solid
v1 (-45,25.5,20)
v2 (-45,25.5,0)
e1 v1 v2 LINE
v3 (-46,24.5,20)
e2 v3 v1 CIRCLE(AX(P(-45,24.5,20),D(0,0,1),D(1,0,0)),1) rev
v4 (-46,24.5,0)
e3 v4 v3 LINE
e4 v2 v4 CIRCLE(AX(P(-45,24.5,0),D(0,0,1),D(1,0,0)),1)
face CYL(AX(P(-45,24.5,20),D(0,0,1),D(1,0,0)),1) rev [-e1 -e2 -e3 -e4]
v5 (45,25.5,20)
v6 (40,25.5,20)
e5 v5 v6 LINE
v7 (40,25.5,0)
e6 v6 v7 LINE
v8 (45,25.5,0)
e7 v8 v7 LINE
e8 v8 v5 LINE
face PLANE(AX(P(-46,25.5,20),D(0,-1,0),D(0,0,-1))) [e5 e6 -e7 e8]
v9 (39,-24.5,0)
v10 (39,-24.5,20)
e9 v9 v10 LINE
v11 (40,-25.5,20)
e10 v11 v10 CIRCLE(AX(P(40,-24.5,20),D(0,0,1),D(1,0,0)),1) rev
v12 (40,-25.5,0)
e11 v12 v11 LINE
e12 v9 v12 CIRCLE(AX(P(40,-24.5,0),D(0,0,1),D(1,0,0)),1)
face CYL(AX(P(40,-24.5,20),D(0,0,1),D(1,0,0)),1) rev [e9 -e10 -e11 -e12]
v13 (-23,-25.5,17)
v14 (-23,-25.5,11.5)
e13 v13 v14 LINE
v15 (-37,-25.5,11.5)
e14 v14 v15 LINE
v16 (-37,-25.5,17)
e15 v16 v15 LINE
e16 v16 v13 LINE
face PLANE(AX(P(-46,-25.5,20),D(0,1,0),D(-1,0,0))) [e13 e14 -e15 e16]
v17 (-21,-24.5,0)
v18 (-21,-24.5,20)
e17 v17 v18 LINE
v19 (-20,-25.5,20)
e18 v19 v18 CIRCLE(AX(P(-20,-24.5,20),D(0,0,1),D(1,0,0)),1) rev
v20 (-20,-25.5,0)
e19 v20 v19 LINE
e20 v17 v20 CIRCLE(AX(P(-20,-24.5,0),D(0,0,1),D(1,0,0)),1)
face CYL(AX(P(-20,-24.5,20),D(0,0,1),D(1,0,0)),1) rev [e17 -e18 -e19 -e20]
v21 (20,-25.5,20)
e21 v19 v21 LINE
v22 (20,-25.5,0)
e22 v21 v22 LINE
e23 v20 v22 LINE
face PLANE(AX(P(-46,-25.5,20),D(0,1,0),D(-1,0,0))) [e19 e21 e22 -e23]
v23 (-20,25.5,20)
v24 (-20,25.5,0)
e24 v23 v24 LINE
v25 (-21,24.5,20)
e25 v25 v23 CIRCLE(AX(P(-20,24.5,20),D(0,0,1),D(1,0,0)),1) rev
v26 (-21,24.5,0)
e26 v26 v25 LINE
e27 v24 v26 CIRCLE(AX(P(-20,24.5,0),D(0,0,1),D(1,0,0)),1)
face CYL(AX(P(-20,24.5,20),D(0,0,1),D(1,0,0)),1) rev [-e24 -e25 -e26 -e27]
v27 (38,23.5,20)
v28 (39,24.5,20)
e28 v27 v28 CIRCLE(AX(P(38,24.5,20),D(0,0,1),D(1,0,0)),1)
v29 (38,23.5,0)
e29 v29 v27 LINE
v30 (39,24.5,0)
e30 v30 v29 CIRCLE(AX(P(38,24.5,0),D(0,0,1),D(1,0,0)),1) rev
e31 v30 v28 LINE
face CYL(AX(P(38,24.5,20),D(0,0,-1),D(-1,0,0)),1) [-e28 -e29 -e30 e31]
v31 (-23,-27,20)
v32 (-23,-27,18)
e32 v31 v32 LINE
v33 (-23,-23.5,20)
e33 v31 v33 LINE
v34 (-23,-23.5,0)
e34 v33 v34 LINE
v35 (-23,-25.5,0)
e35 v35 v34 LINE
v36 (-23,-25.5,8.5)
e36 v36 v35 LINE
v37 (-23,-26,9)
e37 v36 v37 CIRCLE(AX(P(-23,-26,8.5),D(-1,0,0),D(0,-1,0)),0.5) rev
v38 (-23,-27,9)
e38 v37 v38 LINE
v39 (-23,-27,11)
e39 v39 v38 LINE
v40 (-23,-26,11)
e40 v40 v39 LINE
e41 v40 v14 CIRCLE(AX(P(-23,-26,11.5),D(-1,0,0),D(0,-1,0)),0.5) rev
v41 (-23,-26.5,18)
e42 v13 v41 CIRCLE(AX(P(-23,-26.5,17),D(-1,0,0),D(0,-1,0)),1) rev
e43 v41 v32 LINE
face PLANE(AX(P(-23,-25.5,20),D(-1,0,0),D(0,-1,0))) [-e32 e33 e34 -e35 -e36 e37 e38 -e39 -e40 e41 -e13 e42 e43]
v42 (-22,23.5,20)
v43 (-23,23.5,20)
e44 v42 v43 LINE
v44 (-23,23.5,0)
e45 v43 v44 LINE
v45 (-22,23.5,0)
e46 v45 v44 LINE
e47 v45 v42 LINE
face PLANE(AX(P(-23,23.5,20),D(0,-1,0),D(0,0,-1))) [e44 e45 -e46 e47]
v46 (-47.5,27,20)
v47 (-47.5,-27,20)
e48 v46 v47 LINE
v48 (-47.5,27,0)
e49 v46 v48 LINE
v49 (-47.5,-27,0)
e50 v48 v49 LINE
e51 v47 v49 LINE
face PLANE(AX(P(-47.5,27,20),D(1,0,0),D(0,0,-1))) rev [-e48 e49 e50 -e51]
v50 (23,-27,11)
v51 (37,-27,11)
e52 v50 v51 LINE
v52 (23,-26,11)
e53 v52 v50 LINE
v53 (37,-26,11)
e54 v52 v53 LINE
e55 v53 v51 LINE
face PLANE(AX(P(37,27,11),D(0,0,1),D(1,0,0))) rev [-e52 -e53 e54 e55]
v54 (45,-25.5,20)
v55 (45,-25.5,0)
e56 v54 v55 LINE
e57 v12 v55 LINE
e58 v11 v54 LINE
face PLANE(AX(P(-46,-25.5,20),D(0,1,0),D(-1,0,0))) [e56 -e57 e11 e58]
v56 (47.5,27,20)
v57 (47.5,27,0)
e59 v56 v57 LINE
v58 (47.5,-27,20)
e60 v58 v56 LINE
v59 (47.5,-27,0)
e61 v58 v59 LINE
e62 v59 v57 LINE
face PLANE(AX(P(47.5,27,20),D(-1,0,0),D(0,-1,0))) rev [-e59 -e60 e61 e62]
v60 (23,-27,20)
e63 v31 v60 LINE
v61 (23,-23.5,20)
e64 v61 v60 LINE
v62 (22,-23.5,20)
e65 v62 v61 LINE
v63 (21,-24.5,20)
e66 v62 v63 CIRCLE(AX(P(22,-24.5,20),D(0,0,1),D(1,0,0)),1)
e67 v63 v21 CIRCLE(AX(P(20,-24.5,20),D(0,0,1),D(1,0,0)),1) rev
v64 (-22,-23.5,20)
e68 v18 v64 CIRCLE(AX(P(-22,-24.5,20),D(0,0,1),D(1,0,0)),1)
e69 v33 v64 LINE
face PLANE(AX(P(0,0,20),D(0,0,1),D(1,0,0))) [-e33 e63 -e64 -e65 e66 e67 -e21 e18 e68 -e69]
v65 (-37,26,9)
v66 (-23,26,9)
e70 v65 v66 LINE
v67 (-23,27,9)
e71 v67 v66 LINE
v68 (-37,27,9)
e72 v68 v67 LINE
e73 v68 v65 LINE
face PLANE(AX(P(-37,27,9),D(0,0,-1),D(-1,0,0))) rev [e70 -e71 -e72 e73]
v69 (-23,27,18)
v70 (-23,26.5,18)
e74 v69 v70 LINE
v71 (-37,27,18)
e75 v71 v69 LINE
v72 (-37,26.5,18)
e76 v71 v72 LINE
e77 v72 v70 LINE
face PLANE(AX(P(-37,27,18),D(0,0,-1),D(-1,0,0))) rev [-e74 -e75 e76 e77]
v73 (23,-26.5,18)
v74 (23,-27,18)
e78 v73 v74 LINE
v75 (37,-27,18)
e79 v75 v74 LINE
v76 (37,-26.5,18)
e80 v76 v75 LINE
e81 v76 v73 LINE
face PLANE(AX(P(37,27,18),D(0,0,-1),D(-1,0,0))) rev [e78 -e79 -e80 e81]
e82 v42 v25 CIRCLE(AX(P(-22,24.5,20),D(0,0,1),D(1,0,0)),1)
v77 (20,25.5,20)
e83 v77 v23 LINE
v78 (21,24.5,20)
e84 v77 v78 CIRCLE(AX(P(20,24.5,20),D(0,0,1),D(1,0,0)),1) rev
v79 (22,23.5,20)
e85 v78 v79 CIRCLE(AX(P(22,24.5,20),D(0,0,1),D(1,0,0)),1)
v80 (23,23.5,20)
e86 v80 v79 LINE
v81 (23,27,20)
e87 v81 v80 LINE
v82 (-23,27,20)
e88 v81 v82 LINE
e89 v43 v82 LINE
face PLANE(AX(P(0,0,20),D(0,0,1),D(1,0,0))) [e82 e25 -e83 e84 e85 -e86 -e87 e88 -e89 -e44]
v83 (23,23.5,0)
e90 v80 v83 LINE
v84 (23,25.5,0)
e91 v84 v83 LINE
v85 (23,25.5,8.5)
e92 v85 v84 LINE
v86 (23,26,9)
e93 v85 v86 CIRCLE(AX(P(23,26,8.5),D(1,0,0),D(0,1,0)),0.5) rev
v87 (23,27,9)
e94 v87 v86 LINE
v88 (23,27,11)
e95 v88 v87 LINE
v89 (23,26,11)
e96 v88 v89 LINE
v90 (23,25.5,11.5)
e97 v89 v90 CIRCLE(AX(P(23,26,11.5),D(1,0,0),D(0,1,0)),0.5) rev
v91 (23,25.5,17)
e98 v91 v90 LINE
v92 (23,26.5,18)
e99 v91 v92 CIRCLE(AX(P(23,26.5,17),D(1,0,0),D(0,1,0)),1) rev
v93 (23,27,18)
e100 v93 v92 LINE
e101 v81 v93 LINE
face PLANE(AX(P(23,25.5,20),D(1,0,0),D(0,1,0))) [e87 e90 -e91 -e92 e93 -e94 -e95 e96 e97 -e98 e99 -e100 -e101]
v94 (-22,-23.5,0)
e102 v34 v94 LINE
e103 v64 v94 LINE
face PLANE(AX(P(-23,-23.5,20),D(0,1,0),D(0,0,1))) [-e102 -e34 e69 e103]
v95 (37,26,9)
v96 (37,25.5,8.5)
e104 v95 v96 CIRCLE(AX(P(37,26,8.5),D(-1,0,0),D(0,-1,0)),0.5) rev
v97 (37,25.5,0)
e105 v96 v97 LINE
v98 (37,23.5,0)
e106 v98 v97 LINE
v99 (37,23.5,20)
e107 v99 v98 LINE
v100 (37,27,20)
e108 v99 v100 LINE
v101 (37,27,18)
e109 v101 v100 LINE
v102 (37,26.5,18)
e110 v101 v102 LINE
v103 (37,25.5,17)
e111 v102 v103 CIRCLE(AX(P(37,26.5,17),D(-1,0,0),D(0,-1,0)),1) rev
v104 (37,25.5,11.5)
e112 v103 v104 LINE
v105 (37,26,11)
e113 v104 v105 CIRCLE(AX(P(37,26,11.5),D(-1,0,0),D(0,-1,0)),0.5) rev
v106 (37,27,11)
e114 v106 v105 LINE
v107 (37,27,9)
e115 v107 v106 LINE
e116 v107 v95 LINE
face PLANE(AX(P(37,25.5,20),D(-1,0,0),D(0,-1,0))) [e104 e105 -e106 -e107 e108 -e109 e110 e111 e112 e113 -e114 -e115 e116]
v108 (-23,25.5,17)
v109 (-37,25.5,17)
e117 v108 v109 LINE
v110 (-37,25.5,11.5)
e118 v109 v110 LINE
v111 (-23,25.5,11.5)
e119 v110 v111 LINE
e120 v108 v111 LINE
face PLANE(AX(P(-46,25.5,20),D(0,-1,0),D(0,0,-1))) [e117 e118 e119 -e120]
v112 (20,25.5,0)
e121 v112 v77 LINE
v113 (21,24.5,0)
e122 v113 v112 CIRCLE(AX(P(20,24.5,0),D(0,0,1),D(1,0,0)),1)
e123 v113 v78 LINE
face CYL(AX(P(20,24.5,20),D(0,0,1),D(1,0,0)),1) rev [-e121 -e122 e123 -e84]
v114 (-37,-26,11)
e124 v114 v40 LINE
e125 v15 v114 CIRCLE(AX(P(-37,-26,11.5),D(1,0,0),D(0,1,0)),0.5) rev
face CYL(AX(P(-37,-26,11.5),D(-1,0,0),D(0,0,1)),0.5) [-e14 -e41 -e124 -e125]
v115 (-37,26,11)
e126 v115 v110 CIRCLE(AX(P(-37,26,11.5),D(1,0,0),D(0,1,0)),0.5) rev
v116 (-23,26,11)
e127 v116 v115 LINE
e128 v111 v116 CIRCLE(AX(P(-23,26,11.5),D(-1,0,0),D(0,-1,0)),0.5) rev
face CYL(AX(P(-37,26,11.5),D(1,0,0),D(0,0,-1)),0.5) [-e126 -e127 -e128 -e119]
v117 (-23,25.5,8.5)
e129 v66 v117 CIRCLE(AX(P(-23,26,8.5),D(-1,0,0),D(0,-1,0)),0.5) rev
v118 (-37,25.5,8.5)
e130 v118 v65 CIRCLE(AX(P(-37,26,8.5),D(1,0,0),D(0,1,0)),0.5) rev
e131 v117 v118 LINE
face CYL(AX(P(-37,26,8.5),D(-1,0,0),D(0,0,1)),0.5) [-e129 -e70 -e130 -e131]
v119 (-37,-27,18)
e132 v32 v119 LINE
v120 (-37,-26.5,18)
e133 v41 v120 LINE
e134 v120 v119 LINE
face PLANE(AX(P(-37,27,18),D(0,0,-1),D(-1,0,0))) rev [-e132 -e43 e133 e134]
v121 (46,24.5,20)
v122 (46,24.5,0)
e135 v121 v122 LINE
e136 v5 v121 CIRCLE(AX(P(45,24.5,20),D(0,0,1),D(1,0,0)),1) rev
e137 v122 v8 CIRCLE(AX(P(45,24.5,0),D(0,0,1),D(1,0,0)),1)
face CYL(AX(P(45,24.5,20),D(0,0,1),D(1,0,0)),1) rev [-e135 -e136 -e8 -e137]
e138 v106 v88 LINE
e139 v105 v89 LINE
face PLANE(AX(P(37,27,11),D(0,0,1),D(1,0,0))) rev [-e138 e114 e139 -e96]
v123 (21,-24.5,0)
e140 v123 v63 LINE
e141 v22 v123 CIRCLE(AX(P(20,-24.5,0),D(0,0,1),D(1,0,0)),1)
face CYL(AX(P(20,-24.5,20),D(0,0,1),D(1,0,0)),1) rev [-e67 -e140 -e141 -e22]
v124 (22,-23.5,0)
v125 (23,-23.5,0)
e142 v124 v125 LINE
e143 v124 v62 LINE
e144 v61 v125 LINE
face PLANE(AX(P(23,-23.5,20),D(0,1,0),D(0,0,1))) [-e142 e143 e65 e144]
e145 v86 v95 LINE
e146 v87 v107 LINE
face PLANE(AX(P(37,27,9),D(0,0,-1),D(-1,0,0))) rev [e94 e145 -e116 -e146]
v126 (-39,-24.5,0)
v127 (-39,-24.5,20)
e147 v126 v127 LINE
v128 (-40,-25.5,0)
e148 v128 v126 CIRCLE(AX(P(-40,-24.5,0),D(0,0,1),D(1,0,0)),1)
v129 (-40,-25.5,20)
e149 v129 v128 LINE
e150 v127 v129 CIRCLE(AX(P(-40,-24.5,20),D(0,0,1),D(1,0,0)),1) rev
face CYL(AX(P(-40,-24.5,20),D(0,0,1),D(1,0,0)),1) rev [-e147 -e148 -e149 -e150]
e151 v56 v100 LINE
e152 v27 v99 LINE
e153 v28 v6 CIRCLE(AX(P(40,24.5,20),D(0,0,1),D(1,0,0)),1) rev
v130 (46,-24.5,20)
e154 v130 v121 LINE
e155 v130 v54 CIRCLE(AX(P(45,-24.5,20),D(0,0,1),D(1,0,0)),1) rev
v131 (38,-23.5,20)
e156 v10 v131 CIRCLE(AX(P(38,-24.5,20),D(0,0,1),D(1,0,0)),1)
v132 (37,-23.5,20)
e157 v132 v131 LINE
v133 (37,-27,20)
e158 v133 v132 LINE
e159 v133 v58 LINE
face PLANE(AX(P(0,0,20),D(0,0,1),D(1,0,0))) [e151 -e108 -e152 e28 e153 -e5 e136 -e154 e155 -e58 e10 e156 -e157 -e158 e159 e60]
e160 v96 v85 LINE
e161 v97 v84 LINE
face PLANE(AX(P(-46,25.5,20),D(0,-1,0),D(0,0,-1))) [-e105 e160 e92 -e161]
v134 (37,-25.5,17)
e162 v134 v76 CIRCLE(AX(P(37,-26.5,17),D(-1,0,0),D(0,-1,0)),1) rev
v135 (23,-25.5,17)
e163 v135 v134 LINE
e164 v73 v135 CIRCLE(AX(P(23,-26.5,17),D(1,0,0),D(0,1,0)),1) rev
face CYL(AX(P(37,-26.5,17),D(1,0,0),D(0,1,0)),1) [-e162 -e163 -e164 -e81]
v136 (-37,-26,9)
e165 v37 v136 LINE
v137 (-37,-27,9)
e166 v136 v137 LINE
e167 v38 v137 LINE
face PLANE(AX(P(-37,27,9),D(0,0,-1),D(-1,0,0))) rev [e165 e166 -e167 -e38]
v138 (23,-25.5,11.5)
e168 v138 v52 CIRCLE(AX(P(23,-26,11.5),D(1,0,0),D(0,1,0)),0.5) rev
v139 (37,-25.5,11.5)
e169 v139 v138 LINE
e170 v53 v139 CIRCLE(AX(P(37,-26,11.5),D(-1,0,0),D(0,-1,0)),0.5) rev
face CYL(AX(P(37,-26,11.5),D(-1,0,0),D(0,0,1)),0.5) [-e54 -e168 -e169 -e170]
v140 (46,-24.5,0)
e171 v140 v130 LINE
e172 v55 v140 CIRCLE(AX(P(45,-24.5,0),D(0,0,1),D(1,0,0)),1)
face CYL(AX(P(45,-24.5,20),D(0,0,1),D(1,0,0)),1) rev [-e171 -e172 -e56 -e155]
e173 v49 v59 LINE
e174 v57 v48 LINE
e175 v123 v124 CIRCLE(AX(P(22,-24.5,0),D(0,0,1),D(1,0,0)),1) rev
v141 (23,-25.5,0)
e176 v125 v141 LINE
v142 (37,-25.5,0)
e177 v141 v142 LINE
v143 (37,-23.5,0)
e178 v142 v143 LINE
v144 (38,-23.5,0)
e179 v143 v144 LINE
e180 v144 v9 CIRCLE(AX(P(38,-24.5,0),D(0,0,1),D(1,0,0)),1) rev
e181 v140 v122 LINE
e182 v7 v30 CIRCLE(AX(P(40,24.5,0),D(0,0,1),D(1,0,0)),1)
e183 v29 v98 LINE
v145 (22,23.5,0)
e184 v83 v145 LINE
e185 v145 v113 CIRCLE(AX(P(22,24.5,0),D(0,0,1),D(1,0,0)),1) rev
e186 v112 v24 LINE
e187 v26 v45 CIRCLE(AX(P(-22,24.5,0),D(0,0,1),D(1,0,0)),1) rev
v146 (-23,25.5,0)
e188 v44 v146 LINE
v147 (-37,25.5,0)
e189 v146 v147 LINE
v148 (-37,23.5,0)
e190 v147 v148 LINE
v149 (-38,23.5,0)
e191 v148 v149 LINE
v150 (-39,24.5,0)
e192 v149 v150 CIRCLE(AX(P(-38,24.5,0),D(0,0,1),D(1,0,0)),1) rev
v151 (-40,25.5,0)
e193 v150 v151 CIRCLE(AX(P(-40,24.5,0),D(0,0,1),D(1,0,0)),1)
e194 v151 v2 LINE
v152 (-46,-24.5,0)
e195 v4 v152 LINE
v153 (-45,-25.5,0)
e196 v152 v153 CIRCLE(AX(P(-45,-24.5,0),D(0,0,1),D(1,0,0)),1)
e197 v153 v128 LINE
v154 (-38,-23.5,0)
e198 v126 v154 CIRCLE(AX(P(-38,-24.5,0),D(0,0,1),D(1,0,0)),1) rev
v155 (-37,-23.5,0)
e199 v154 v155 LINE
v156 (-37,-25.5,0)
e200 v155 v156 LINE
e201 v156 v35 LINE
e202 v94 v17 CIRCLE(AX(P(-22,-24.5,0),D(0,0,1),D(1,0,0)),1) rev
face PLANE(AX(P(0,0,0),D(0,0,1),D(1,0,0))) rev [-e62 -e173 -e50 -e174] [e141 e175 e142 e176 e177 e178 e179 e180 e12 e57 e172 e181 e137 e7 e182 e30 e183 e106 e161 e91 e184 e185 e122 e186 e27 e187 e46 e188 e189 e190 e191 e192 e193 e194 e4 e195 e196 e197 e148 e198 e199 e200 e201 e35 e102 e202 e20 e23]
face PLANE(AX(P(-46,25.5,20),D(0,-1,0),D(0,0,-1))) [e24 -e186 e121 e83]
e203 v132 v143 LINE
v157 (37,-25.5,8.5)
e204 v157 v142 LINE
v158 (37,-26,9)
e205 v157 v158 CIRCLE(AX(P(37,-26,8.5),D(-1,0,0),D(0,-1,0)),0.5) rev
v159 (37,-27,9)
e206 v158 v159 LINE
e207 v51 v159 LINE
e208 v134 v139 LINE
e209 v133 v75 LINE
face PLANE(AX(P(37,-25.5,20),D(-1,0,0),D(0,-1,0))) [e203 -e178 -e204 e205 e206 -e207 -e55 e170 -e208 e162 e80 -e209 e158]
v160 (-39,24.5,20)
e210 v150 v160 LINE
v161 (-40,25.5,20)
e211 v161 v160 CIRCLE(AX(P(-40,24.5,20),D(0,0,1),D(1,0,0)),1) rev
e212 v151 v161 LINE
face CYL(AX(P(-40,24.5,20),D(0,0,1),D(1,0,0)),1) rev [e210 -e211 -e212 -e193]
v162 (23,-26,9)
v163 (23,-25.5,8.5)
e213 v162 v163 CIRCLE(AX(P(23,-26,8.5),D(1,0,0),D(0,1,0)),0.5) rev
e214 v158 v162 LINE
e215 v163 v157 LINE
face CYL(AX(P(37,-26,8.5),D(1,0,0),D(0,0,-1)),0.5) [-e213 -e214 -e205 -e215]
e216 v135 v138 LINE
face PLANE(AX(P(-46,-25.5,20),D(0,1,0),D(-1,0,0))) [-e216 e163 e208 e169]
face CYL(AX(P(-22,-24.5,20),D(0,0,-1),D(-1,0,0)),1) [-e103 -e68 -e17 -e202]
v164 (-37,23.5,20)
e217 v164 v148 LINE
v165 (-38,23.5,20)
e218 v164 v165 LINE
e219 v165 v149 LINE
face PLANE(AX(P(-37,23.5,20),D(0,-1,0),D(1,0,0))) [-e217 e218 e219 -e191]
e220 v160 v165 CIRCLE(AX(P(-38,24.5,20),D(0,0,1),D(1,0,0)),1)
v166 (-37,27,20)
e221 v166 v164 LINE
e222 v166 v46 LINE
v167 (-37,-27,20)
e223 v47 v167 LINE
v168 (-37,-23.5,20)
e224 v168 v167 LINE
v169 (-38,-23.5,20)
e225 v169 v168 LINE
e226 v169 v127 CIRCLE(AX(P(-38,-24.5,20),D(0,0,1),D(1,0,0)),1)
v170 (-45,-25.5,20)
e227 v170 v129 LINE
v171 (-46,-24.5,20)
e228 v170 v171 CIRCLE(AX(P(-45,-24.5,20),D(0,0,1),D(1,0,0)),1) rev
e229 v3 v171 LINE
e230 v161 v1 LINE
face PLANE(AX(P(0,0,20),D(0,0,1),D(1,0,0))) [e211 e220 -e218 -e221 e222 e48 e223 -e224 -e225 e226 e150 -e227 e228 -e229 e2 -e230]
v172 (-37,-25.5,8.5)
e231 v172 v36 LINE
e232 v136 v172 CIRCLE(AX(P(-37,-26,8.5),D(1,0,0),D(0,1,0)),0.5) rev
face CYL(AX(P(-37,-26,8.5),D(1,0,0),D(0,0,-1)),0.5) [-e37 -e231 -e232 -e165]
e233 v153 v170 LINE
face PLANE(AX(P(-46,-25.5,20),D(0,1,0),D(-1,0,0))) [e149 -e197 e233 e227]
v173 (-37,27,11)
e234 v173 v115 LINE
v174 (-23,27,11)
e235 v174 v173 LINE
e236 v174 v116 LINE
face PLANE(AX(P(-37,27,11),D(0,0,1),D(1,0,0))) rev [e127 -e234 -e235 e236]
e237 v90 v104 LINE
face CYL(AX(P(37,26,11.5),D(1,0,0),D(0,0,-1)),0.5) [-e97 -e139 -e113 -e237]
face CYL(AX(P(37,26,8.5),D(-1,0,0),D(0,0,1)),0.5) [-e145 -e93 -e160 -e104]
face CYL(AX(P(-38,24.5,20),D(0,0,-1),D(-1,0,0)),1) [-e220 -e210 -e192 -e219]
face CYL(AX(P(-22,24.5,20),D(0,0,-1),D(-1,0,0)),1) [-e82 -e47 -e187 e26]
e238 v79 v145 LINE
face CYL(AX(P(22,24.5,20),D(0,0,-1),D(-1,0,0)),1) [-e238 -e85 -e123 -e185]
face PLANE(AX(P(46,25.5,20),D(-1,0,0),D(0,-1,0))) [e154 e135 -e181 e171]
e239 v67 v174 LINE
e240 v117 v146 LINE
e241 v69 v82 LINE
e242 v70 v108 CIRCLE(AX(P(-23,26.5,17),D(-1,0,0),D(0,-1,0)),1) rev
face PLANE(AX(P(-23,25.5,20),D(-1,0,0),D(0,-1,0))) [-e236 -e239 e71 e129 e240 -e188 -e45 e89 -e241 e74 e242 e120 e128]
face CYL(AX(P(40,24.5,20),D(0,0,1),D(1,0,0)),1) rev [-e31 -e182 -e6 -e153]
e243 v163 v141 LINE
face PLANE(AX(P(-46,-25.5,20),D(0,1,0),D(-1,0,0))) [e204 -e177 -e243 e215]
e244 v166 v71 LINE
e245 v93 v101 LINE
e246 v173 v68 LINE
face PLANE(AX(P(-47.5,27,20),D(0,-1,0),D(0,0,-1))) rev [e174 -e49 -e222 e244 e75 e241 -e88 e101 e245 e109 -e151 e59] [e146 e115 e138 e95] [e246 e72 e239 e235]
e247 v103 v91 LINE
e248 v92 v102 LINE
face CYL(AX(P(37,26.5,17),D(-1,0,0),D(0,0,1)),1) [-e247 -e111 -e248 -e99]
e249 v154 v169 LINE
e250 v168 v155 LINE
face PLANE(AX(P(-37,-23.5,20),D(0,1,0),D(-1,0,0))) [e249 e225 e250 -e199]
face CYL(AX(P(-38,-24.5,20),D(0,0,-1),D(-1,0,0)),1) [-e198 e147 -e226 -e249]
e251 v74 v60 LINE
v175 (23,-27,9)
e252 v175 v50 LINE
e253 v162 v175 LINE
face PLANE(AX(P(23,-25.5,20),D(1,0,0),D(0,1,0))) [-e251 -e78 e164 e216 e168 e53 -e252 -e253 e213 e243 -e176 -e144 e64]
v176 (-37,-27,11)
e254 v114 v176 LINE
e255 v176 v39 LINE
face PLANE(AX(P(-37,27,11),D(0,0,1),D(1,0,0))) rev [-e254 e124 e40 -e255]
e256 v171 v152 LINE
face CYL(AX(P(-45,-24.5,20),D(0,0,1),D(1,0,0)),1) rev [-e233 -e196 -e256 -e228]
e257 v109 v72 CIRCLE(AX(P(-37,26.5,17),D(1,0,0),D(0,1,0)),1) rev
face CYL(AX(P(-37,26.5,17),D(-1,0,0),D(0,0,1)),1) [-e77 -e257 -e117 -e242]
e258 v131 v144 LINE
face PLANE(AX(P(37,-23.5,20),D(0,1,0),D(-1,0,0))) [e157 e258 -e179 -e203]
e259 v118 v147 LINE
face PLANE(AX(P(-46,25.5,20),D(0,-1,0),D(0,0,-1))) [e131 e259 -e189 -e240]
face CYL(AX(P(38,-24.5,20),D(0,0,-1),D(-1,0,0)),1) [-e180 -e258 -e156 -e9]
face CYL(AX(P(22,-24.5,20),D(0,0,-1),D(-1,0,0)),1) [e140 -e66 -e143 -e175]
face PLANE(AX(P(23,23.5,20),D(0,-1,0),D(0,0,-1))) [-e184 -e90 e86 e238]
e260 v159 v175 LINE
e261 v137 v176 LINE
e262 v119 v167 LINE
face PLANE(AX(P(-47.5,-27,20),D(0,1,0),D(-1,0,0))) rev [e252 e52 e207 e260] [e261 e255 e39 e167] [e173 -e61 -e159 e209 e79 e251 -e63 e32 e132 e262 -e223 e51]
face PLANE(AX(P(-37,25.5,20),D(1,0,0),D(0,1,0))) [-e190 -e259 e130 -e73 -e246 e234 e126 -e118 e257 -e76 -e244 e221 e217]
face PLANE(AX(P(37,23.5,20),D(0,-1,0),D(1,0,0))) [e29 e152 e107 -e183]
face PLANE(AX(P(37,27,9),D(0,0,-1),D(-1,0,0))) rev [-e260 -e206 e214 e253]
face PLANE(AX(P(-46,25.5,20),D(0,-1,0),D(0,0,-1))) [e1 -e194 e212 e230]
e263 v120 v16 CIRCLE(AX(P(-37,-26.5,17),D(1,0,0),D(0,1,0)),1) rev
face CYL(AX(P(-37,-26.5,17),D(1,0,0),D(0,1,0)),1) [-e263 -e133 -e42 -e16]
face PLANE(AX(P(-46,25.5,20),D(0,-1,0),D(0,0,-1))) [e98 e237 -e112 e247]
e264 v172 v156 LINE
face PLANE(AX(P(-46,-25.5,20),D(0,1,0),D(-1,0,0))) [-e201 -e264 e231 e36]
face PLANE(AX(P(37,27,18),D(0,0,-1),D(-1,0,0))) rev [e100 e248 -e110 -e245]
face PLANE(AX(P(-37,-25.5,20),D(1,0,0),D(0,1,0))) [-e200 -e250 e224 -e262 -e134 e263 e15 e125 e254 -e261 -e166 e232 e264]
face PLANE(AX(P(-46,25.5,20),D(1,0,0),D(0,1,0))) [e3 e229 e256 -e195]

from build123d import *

# Parameters (mm, degrees)
SKETCH1_W               = 95
SKETCH1_H               = 54
SKETCH1_W_2             = 92
SKETCH1_H_2             = 51
BOSS_EXTRUDE1_DEPTH     = 20
SKETCH2_W               = 2
SKETCH2_H               = 2
BOSS_EXTRUDE2_DEPTH     = 20
FILLET1_R               = 1
CUT_EXTRUDE1_DEPTH      = 75.647504982
CUT_EXTRUDE1_DEPTH_BACK = 75.647504982
SKETCH3_W               = 14
SKETCH3_H               = 2
FILLET2_R               = 1
FILLET3_R               = 0.5


with BuildPart() as part:
    # Sketch1 → Boss-Extrude1 (new body)
    with BuildSketch(Plane.XY):
        Rectangle(SKETCH1_W, SKETCH1_H)
        Rectangle(SKETCH1_W_2, SKETCH1_H_2, mode=Mode.SUBTRACT)
    extrude(amount=BOSS_EXTRUDE1_DEPTH)

    # Sketch2 → Boss-Extrude2 (add)
    with BuildSketch(Plane(origin=(0, 0, 0), x_dir=(-1, 0, 0), z_dir=(0, 0, -1))):
        with Locations((22, 24.5)):
            Rectangle(SKETCH2_W, SKETCH2_H)
        with Locations((-38, 24.5)):
            Rectangle(SKETCH2_W, SKETCH2_H)
        with Locations((38, 24.5)):
            Rectangle(SKETCH2_W, SKETCH2_H)
        with Locations((-22, 24.5)):
            Rectangle(SKETCH2_W, SKETCH2_H)
        with Locations((38, -24.5)):
            Rectangle(SKETCH2_W, SKETCH2_H)
        with Locations((22, -24.5)):
            Rectangle(SKETCH2_W, SKETCH2_H)
        with Locations((-22, -24.5)):
            Rectangle(SKETCH2_W, SKETCH2_H)
        with Locations((-38, -24.5)):
            Rectangle(SKETCH2_W, SKETCH2_H)
    extrude(amount=-BOSS_EXTRUDE2_DEPTH)

    # Fillet1
    fillet1_edges = [part.edges().sort_by_distance(p)[0] for p in [
        (-46, -25.5, 10),
        (-46, 25.5, 10),
        (46, -25.5, 10),
        (39, -25.5, 10),
        (39, -23.5, 10),
        (21, -23.5, 10),
        (21, -25.5, 10),
        (-21, -25.5, 10),
        (-21, -23.5, 10),
        (-39, -23.5, 10),
        (-39, -25.5, 10),
        (-39, 25.5, 10),
        (-39, 23.5, 10),
        (-21, 23.5, 10),
        (-21, 25.5, 10),
        (21, 25.5, 10),
        (21, 23.5, 10),
        (39, 23.5, 10),
        (39, 25.5, 10),
        (46, 25.5, 10),
    ]]
    fillet(fillet1_edges, radius=FILLET1_R - 0.0001)  # a hair under: the kernel refuses the full size

    # Sketch3 → Cut-Extrude1 (cut, two sides: drawn at the far end of the back side and taken through both)
    with BuildSketch(Plane.XZ.offset(27).offset(-CUT_EXTRUDE1_DEPTH_BACK)):
        with Locations((-30, 10)):
            Rectangle(SKETCH3_W, SKETCH3_H)
        with Locations((30, 10)):
            Rectangle(SKETCH3_W, SKETCH3_H)
        with Locations((30, 19)):
            Rectangle(SKETCH3_W, SKETCH3_H)
        with Locations((-30, 19)):
            Rectangle(SKETCH3_W, SKETCH3_H)
    extrude(amount=CUT_EXTRUDE1_DEPTH + CUT_EXTRUDE1_DEPTH_BACK, mode=Mode.SUBTRACT)

    # Fillet2
    fillet2_edges = [part.edges().sort_by_distance(p)[0] for p in [
        (-30, -25.5, 18),
        (-30, 25.5, 18),
        (30, -25.5, 18),
        (30, 25.5, 18),
    ]]
    fillet(fillet2_edges, radius=FILLET2_R)

    # Fillet3
    fillet3_edges = [part.edges().sort_by_distance(p)[0] for p in [
        (30, -25.5, 9),
        (30, 25.5, 9),
        (30, -25.5, 11),
        (30, 25.5, 11),
        (-30, -25.5, 11),
        (-30, 25.5, 11),
        (-30, -25.5, 9),
        (-30, 25.5, 9),
    ]]
    fillet(fillet3_edges, radius=FILLET3_R)


solid = part.part
